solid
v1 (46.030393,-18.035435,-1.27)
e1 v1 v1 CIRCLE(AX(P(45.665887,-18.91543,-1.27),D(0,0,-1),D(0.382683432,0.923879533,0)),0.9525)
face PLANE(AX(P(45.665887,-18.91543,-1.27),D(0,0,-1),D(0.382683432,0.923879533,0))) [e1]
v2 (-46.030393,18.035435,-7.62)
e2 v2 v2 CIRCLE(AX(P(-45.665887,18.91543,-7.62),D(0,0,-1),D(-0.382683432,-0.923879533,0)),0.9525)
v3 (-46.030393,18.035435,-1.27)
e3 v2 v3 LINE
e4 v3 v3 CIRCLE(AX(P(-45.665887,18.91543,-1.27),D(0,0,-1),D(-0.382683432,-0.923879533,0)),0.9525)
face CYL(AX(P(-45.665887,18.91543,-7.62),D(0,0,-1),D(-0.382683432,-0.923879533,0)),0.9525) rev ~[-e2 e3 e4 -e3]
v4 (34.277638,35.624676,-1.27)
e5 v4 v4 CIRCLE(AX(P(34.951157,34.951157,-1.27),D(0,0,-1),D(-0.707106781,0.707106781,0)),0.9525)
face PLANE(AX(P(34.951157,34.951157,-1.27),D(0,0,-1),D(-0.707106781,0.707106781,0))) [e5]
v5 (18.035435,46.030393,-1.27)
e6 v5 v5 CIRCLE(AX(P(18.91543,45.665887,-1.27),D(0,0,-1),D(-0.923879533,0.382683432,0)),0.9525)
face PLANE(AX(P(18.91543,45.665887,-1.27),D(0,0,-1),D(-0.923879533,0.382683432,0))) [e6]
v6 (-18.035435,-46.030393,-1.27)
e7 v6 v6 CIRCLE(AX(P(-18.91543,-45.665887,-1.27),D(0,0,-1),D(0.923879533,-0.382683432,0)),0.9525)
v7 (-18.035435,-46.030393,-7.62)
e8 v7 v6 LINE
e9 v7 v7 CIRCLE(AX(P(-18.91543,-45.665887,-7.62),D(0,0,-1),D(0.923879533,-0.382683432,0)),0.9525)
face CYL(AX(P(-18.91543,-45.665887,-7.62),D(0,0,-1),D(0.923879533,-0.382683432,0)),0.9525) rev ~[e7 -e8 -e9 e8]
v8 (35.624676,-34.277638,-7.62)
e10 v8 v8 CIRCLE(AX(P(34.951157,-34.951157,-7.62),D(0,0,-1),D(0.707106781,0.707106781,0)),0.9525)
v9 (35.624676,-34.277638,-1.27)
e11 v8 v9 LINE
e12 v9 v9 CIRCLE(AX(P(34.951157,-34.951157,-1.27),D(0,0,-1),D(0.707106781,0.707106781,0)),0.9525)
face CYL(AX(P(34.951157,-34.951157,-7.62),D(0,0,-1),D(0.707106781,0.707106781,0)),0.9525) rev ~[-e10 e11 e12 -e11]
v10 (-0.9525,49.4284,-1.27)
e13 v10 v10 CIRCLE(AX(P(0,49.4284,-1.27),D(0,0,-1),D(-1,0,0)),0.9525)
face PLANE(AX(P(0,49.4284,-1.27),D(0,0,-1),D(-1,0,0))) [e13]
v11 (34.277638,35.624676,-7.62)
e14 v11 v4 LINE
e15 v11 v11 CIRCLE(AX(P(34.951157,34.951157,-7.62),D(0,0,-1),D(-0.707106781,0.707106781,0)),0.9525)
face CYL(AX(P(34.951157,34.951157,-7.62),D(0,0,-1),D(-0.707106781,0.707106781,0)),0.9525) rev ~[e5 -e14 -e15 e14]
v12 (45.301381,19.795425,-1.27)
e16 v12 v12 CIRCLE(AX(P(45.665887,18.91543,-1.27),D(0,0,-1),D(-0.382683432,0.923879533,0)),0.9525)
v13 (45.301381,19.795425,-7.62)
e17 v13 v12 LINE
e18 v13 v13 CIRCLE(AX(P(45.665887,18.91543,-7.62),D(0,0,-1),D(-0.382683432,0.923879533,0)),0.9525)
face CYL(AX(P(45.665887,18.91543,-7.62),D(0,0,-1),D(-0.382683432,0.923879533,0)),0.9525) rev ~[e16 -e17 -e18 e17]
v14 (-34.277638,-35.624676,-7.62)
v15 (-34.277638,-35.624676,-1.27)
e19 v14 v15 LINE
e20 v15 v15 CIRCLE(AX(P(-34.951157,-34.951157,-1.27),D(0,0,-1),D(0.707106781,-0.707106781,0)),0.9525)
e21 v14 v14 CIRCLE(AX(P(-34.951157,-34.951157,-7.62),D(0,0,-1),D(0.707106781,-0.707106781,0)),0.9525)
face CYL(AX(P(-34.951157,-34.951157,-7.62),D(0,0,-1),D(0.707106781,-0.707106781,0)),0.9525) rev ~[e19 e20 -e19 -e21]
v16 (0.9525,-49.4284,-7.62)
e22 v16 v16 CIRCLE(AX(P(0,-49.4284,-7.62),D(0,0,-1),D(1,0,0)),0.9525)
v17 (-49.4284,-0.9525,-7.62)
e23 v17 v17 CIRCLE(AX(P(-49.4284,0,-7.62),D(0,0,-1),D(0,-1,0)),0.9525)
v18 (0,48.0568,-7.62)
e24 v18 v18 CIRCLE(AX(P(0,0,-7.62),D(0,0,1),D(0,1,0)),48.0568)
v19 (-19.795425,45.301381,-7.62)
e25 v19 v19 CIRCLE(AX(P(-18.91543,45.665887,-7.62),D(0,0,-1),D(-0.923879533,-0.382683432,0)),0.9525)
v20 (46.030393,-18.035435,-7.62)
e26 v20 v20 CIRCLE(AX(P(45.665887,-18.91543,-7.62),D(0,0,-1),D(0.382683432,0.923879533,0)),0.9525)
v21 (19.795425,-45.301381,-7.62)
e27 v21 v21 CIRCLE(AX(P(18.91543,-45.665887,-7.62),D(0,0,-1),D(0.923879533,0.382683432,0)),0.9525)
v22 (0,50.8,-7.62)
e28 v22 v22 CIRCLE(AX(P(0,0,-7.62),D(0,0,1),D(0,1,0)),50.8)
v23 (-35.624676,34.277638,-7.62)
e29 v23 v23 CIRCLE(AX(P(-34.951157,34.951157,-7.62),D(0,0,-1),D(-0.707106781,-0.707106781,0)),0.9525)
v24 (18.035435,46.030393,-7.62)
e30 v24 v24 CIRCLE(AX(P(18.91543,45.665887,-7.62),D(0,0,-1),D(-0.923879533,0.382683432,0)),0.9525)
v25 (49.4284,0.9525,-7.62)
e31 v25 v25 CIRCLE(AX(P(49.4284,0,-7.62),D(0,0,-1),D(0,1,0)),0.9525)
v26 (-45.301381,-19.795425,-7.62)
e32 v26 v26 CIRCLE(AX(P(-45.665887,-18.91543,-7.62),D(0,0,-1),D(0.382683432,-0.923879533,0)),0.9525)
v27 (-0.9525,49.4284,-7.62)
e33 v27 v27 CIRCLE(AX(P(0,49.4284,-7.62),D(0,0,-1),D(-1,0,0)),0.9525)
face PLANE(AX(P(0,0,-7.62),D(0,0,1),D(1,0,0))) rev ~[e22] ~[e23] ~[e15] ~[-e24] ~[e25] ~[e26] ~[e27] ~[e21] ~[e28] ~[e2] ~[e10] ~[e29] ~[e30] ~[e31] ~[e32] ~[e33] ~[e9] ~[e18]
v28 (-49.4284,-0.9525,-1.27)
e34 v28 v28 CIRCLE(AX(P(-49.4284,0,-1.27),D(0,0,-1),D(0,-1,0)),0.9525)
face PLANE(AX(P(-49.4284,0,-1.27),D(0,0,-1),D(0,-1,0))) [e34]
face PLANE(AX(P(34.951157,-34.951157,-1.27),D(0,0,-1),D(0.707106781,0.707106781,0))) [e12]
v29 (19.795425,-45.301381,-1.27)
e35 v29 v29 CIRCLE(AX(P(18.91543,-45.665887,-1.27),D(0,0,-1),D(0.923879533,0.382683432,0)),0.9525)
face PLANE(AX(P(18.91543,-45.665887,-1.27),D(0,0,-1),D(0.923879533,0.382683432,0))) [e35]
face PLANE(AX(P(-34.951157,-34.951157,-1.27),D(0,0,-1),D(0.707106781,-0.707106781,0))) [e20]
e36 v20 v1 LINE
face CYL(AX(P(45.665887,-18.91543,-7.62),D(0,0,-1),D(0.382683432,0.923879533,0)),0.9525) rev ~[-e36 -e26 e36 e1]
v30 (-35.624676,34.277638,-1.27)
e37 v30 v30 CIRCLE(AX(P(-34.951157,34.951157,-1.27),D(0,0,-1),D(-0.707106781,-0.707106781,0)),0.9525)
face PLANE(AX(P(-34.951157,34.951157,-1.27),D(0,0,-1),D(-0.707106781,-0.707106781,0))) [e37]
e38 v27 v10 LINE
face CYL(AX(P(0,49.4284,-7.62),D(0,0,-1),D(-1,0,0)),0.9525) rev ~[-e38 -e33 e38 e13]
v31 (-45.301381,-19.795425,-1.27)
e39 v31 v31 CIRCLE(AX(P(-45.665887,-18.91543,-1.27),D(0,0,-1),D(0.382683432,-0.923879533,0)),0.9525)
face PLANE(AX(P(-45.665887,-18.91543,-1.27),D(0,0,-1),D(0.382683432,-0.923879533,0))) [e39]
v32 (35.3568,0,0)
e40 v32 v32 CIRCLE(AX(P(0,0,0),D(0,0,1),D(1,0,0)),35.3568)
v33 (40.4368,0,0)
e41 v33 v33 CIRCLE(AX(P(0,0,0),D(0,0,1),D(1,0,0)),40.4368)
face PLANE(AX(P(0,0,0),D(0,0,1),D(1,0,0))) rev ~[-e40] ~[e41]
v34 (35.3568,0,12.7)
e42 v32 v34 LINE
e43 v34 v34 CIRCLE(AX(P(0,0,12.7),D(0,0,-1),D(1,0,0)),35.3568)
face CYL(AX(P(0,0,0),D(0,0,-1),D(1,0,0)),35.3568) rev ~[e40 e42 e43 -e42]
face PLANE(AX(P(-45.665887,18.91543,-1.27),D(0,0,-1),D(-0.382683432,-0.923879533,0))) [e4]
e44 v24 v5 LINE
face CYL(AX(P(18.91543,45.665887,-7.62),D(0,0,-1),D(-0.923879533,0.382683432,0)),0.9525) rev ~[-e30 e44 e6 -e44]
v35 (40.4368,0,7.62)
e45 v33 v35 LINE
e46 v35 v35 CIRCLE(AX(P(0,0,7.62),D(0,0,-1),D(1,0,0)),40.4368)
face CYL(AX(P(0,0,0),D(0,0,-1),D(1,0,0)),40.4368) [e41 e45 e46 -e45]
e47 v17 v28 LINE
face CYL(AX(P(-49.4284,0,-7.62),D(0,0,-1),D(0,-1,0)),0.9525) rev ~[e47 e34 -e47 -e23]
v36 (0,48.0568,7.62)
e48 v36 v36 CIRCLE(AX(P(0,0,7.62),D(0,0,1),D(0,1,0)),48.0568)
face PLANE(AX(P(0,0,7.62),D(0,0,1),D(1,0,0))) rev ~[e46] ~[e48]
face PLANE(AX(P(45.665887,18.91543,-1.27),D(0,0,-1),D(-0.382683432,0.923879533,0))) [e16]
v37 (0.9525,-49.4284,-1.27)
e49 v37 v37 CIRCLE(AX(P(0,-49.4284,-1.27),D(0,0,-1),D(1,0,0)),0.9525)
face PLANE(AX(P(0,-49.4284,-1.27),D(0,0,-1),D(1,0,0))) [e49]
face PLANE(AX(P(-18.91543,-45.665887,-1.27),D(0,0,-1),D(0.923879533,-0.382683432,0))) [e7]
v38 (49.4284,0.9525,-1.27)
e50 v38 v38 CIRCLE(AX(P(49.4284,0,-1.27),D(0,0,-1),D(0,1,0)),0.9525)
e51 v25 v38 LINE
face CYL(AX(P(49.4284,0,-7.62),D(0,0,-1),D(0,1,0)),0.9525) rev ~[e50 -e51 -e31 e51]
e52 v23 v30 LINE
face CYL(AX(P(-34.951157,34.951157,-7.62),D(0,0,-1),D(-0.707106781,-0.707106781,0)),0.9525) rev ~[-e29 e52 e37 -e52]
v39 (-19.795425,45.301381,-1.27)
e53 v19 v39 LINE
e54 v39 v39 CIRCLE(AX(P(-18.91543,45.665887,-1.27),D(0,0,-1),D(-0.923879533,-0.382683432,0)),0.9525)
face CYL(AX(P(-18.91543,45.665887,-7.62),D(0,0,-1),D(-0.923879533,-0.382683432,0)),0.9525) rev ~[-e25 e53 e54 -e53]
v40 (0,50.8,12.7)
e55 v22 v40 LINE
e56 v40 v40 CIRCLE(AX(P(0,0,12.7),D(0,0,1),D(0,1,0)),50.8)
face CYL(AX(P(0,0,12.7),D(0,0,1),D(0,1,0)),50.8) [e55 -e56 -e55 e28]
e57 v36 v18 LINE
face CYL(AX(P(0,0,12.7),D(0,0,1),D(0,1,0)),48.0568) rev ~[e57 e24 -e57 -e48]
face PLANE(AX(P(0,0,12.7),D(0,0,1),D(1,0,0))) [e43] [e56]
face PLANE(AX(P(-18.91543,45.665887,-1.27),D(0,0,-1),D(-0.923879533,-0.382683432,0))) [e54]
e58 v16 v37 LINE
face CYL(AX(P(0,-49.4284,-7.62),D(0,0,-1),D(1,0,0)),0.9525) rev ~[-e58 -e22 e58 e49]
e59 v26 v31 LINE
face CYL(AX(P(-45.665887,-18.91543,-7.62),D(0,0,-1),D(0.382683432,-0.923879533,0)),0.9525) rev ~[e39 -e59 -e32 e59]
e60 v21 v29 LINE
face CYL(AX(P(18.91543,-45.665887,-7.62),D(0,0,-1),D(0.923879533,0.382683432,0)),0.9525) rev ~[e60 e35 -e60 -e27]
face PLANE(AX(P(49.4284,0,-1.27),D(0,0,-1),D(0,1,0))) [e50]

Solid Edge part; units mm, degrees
sketch "Sketch1" plane through (0, 0, 0) normal (0, 0, 1) x (1, 0, 0)
  circle A0 centre (0, 0) radius 35.3568
  circle A1 centre (0, 0) radius 40.4368
  dimension "D1" = 70.7136
  dimension "D2" = 80.8736
extrude "Protrusion1" add sketch "Sketch1" along normal blind 12.7
sketch "Sketch2" plane through (0, 0, 12.7) normal (0, 0, 1) x (0, 1, 0)
  circle A0 centre (0, 0) radius 50.8
extrude "ExtrudedProtrusion_2" add sketch "Sketch2" against normal blind 5.08
sketch "Sketch3" plane through (0, 0, 12.7) normal (0, 0, 1) x (0, 1, 0)
  circle A0 centre (0, 0) radius 48.0568
  circle A1 centre (0, 0) radius 50.8
  dimension "D1" = 101.6
  dimension "D2" = 96.1136
extrude "ExtrudedProtrusion_3" add sketch "Sketch3" against normal blind 20.32
sketch "Sketch4" plane through (0, 0, 0) normal (0, 0, 1) x (1, 0, 0)
  circle A0 centre (0, 0) radius 35.3568
extrude "Cutout1" cut sketch "Sketch4" along normal up to next
sketch "Sketch5" plane through (0, 0, -7.62) normal (0, 0, -1) x (-1, 0, 0)
  circle A0 centre (0, 49.4284) radius 0.9525
extrude "ExtrudedCutout_2" cut sketch "Sketch5" against normal blind 6.35
pattern_circular "Pattern_1" count 16 over 360 about axis through (0, 0, 0) along (0, 0, -1) of "ExtrudedCutout_2"
